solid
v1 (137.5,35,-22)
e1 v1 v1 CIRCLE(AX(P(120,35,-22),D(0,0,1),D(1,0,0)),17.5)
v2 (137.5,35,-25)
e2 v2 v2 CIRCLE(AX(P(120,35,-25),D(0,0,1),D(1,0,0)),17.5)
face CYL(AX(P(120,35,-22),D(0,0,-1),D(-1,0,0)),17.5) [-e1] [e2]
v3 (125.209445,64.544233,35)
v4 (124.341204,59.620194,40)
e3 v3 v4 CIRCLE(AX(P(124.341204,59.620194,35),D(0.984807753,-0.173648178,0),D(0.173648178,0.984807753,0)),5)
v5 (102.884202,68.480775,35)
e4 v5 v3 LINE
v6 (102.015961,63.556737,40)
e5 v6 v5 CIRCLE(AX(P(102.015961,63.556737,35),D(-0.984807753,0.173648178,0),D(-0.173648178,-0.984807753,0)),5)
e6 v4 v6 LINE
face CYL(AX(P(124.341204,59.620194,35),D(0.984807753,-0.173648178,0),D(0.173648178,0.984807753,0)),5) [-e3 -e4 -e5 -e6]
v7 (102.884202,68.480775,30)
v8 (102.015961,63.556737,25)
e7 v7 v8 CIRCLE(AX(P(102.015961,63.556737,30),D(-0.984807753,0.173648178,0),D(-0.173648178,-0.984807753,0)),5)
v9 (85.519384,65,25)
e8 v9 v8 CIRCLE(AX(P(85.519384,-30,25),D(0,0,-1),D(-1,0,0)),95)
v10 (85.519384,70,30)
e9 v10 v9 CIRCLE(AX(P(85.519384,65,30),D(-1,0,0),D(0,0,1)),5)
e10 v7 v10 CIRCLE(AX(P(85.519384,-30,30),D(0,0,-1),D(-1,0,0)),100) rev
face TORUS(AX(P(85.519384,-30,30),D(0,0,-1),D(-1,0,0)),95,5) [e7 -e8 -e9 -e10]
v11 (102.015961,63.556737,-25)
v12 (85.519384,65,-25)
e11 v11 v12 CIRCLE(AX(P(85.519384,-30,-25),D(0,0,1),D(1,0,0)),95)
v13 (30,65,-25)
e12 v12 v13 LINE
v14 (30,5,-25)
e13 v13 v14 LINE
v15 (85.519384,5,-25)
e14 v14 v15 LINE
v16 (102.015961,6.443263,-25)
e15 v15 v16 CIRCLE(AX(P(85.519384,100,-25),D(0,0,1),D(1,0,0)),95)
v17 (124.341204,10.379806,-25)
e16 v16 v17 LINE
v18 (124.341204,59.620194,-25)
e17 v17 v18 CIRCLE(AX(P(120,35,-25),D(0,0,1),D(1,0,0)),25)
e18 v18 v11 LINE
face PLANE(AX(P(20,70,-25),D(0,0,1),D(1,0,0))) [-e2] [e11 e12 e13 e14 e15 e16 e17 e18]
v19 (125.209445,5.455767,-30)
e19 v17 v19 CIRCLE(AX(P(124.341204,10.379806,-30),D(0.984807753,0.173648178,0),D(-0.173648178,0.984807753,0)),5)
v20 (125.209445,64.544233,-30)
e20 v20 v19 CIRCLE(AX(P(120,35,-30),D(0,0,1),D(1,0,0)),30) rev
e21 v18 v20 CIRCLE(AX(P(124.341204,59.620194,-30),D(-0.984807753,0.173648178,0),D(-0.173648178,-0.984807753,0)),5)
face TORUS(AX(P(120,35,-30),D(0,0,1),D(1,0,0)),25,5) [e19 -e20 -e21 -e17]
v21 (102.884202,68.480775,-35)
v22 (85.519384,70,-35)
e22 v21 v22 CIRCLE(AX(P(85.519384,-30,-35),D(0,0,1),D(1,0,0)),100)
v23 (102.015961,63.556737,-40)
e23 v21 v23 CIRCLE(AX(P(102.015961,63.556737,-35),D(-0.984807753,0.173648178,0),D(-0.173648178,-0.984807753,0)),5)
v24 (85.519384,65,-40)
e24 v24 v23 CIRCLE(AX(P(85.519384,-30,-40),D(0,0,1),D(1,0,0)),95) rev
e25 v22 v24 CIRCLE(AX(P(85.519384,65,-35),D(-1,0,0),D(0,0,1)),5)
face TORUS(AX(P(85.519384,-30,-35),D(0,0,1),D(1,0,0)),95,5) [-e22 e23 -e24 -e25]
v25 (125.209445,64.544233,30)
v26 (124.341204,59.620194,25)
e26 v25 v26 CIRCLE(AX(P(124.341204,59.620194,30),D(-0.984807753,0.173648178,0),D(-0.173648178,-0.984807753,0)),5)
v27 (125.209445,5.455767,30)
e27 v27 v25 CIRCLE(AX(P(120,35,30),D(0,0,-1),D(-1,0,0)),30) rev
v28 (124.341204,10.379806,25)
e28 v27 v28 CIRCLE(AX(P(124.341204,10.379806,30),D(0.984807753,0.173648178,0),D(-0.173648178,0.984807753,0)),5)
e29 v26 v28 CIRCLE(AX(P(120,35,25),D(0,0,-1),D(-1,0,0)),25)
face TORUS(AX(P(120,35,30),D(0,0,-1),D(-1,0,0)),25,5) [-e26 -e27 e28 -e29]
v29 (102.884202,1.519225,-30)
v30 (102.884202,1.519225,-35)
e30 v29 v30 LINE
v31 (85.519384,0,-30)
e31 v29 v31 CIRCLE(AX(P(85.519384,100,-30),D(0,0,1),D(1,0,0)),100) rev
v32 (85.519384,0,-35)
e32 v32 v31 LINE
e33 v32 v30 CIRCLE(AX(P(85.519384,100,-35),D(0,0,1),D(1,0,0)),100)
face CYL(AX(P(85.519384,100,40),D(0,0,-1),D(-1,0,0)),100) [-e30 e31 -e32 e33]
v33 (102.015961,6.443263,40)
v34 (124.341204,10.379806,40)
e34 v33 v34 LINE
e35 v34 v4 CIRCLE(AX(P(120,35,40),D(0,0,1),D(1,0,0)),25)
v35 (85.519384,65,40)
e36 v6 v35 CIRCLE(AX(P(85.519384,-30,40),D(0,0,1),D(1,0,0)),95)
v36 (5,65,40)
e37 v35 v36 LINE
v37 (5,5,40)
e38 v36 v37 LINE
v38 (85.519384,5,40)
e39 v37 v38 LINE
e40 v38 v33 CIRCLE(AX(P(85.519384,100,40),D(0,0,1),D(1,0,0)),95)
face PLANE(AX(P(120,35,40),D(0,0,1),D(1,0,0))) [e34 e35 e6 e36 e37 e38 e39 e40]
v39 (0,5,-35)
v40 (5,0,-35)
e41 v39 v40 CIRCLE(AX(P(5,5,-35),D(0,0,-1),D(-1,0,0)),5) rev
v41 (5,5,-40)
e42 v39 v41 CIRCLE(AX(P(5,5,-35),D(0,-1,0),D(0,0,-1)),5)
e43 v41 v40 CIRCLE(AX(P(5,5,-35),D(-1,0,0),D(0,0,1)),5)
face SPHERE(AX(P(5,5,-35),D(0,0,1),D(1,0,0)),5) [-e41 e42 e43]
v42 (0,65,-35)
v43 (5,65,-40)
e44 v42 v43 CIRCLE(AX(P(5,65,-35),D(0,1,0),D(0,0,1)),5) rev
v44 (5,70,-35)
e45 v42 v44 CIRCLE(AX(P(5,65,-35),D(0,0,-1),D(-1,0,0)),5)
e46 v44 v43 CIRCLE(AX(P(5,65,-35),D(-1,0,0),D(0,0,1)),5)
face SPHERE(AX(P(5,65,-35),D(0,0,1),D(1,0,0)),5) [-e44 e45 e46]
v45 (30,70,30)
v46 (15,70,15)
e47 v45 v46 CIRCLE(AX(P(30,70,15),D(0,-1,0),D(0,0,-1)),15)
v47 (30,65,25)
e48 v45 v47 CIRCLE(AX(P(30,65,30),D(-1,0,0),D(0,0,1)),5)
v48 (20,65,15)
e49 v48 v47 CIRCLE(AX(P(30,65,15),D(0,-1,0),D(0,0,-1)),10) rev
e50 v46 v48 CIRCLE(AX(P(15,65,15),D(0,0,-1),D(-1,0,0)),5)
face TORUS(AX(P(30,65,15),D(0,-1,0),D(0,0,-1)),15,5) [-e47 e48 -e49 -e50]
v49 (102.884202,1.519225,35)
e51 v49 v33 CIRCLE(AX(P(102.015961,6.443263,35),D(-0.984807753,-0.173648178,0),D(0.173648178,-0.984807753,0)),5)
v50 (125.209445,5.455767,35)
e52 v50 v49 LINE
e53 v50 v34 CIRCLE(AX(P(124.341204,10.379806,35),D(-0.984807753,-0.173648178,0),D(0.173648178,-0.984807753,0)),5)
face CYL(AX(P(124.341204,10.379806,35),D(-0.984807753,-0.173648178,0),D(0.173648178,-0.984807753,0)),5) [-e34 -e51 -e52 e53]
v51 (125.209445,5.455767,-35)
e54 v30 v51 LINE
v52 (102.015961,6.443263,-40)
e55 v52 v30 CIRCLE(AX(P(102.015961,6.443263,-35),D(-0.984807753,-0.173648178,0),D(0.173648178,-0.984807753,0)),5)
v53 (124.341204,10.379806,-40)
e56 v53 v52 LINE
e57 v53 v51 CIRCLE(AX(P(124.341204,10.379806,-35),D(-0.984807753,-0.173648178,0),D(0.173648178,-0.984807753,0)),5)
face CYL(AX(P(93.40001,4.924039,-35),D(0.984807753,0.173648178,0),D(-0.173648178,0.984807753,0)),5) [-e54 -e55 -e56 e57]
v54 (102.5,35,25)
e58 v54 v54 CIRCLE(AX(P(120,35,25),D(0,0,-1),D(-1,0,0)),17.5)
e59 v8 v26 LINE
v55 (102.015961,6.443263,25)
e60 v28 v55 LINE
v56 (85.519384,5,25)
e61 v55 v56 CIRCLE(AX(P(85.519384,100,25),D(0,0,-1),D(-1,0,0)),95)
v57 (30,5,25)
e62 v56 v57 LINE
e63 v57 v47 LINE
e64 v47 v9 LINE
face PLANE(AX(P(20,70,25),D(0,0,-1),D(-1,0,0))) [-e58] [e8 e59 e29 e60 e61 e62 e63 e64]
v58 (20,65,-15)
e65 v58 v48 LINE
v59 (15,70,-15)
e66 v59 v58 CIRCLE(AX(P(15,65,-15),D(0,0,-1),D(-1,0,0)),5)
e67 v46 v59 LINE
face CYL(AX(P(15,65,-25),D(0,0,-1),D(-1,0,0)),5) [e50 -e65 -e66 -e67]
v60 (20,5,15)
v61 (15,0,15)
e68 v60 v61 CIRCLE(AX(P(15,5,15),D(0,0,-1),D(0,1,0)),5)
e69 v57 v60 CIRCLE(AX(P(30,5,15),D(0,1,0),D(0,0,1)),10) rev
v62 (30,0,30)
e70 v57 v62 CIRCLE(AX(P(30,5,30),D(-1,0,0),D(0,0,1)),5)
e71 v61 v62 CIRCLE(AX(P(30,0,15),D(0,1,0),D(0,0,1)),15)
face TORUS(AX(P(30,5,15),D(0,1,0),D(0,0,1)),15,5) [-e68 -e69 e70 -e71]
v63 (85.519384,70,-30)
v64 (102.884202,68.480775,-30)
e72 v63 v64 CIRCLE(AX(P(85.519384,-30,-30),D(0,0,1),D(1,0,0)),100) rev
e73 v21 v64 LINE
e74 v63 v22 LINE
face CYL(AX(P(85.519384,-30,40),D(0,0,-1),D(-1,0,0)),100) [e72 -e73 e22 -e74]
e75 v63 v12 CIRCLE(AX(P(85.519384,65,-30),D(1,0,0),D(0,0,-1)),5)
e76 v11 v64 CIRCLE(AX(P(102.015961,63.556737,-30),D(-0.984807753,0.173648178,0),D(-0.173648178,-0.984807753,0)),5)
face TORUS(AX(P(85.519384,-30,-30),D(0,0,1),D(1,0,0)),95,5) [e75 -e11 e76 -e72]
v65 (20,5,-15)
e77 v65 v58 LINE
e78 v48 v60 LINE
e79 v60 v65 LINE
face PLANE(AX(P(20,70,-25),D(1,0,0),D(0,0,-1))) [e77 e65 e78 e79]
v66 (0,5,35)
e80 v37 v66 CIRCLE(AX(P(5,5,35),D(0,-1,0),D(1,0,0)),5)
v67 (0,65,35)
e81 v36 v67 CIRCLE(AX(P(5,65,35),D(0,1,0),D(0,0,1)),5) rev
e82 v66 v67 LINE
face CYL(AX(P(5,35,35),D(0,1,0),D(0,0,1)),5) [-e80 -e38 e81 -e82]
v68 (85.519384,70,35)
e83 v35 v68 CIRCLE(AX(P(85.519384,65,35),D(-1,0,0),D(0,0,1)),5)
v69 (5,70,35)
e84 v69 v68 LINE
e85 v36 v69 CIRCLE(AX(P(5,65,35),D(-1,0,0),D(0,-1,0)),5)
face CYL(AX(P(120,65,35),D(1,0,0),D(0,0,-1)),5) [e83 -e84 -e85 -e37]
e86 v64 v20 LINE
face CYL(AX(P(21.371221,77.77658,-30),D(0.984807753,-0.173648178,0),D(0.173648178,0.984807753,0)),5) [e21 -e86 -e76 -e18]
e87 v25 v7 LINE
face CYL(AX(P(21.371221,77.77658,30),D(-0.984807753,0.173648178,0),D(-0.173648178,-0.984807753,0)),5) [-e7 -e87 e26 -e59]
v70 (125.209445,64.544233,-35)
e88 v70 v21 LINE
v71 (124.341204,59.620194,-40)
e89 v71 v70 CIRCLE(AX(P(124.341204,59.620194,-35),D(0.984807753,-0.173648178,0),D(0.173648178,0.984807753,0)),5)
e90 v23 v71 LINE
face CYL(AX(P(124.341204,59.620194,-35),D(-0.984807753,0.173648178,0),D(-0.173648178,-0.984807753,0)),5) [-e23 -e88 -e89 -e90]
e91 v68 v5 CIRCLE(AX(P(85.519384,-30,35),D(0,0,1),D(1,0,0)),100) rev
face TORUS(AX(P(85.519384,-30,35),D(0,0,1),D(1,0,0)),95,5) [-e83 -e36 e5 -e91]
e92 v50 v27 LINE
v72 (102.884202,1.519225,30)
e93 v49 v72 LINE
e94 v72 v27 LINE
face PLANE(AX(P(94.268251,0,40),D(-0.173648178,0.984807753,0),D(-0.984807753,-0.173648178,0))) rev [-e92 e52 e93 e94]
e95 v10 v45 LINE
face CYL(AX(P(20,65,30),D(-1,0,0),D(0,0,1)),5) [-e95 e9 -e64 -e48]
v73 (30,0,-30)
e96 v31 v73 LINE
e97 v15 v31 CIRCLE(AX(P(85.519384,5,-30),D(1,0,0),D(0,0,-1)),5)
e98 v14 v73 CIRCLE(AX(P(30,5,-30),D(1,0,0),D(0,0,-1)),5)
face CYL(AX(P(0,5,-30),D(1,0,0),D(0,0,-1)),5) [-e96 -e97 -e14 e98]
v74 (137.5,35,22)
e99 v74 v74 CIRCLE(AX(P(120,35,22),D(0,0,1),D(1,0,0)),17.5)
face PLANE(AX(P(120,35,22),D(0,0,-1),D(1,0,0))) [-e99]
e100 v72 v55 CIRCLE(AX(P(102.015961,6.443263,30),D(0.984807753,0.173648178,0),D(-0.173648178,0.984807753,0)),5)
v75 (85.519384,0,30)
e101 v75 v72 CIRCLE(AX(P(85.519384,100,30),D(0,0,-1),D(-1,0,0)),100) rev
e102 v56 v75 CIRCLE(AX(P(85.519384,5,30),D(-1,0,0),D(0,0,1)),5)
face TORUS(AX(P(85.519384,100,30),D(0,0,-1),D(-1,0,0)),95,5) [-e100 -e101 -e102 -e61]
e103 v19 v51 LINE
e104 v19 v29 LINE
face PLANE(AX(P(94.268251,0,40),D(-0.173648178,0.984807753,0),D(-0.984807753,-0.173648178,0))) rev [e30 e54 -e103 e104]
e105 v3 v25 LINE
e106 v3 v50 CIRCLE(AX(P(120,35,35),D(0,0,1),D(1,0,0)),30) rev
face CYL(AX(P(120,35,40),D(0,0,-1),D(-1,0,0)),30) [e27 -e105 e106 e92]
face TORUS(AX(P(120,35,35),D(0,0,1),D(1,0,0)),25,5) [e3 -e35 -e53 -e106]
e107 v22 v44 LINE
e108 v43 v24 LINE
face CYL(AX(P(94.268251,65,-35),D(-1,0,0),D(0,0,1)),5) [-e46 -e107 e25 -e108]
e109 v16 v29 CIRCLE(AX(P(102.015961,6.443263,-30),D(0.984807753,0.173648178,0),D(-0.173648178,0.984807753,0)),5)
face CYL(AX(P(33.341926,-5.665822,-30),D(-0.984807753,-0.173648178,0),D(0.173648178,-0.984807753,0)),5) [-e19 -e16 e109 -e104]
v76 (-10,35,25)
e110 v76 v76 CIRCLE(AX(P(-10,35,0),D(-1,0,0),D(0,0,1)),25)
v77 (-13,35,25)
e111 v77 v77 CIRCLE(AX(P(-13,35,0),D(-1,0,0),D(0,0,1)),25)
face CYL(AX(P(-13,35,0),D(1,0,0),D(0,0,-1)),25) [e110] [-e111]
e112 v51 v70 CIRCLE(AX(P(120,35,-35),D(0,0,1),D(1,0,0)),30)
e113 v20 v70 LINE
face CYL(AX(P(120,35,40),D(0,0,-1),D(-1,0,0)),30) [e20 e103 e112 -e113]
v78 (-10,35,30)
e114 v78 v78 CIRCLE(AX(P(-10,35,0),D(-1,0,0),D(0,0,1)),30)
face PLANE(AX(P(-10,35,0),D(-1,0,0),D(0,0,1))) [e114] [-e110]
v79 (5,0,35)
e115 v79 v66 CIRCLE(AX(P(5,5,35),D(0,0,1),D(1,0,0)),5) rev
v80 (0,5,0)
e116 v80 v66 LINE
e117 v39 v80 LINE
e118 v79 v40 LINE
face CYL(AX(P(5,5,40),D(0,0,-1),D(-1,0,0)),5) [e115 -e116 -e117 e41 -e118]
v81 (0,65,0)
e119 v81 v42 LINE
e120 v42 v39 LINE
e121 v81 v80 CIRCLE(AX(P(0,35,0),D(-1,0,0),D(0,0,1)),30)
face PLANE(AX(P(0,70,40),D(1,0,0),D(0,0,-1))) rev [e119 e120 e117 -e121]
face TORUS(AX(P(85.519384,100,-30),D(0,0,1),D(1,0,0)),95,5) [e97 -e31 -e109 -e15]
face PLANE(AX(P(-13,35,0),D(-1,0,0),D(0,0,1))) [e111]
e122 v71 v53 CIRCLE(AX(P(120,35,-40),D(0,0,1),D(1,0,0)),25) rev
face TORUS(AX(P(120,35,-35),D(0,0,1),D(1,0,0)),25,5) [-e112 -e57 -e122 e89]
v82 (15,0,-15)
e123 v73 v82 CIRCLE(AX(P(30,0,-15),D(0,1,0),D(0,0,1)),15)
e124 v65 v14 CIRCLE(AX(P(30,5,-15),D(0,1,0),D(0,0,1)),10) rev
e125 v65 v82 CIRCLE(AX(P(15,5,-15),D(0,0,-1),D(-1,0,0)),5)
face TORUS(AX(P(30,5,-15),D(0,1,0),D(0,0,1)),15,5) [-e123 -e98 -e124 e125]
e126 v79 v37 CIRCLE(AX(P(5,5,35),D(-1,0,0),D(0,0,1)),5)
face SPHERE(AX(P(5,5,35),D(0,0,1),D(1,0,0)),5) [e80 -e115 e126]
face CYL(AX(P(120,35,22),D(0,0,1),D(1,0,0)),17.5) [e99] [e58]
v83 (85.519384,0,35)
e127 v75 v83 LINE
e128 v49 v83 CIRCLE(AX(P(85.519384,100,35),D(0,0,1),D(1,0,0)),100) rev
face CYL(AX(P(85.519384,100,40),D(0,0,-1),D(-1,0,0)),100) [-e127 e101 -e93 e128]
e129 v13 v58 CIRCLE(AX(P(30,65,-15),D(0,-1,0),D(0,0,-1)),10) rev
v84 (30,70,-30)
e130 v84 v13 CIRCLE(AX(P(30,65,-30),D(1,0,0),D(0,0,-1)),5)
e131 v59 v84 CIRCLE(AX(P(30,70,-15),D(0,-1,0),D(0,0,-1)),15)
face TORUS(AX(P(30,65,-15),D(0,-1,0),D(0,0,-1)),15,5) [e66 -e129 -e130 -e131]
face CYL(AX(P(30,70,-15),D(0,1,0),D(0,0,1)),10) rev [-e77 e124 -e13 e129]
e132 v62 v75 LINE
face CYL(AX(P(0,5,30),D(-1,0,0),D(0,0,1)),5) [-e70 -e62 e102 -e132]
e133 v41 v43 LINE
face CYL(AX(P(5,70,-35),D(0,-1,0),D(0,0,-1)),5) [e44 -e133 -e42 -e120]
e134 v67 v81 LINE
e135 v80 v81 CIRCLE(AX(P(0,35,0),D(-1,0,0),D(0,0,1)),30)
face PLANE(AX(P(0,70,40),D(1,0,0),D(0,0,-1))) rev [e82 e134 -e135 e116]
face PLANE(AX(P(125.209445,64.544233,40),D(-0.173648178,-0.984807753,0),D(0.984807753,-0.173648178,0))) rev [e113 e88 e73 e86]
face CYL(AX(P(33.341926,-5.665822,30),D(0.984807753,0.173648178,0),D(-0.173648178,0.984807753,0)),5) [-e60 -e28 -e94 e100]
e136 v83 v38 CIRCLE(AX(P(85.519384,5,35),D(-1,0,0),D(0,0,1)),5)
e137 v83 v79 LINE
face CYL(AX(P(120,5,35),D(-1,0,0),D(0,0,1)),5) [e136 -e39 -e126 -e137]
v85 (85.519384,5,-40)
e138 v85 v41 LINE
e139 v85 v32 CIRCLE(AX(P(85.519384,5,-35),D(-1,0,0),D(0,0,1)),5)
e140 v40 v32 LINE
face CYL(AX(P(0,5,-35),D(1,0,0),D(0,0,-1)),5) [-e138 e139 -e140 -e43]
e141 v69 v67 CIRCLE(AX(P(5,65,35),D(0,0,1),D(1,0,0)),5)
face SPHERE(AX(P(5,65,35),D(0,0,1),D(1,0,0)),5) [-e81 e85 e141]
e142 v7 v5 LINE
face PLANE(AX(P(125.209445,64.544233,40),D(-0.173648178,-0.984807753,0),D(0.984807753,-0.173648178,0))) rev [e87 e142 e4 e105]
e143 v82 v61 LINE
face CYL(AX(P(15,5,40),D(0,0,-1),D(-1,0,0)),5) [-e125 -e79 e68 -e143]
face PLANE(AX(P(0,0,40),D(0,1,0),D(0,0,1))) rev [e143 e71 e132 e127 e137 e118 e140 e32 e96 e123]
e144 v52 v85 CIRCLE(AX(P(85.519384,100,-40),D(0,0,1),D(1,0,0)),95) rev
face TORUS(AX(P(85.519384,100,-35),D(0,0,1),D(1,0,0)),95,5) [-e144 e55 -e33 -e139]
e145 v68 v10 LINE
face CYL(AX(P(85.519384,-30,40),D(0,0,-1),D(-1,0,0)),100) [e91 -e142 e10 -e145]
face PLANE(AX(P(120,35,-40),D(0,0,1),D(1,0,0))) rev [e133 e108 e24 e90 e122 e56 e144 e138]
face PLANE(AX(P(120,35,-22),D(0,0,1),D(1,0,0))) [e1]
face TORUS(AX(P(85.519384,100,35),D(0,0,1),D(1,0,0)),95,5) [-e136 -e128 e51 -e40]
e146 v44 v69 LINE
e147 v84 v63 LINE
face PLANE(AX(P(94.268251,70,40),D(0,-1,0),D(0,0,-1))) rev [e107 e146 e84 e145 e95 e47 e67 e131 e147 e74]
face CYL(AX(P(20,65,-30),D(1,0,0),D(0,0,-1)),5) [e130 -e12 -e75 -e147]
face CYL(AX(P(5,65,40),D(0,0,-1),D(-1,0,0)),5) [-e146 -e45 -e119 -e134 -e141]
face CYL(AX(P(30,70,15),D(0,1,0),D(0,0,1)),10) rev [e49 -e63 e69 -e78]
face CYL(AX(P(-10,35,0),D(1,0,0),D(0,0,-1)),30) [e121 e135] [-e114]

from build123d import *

# Parameters (mm, degrees)
BOSS_EXTRUDE1_DEPTH = 40
SKETCH2_W           = 180
SKETCH2_H           = 50
CUT_EXTRUDE1_DEPTH  = 171.293863659
SKETCH3_R           = 17.5
BOSS_EXTRUDE2_DEPTH = 3
SKETCH4_R           = 30
BOSS_EXTRUDE3_DEPTH = 10
SKETCH5_R           = 25
BOSS_EXTRUDE4_DEPTH = 3
FILLET1_R           = 100
FILLET2_R           = 10
FILLET3_R           = 5


with BuildPart() as part:
    # Sketch1 → Boss-Extrude1 (new, symmetric)
    with BuildSketch(Plane.XY):
        with BuildLine():
            Line((0, 0), (94.268250808, 0))
            Line((94.268250808, 0), (125.20944533, 5.45576741))
            ThreePointArc((125.20944533, 5.45576741), (150, 35), (125.20944533, 64.54423259))
            Line((125.20944533, 64.54423259), (94.268250808, 70))
            Line((94.268250808, 70), (0, 70))
            Line((0, 70), (0, 0))
        make_face()
    extrude(amount=BOSS_EXTRUDE1_DEPTH, both=True)

    # Sketch2 → Cut-Extrude1 (cut, through all)
    with BuildSketch(Plane(origin=(0, 0, 0), x_dir=(1, 0, 0), z_dir=(0, 1, 0))):
        with Locations((110, 0)):
            Rectangle(SKETCH2_W, SKETCH2_H)
    extrude(amount=CUT_EXTRUDE1_DEPTH, mode=Mode.SUBTRACT)

    # Sketch3 → Boss-Extrude2 (add)
    with BuildSketch(Plane.XY.offset(-25)):
        with Locations((120, 35)):
            Circle(SKETCH3_R)
    boss_extrude2 = extrude(amount=BOSS_EXTRUDE2_DEPTH)

    # Mirror1: Boss-Extrude2 across plane
    add(boss_extrude2.mirror(Plane.XY))

    # Sketch4 → Boss-Extrude3 (add)
    with BuildSketch(Plane.ZY):
        with Locations((0, 35)):
            Circle(SKETCH4_R)
    extrude(amount=BOSS_EXTRUDE3_DEPTH)

    # Sketch5 → Boss-Extrude4 (add)
    with BuildSketch(Plane.ZY.offset(10)):
        with Locations((0, 35)):
            Circle(SKETCH5_R)
    extrude(amount=BOSS_EXTRUDE4_DEPTH)

    # Fillet1
    fillet1_edges = [part.edges().sort_by_distance(p)[0] for p in [
        (94.268250808, 70, 32.5),
        (94.268250808, 0, 32.5),
        (94.268250808, 70, -32.5),
        (94.268250808, 0, -32.5),
    ]]
    fillet(fillet1_edges, radius=FILLET1_R)

    # Fillet2
    fillet2_edges = [part.edges().sort_by_distance(p)[0] for p in [
        (20, 35, 25),
        (20, 35, -25),
    ]]
    fillet(fillet2_edges, radius=FILLET2_R)

    # Fillet3
    fillet3_edges = [part.edges().sort_by_distance(p)[0] for p in [
        (0, 70, 0),
        (0, 0, 0),
        (150, 35, 40),
        (114.046823776, 66.512503946, 40),
        (150, 35, 25),
        (114.046823776, 3.487496054, 25),
        (150, 35, -25),
        (114.046823776, 66.512503946, -25),
        (0, 35, 40),
        (114.046823776, 3.487496054, -25),
        (114.046823776, 3.487496054, -40),
        (114.046823776, 66.512503946, -40),
        (42.759692228, 70, -40),
        (94.23495873, 69.619469809, -40),
        (94.23495873, 0.380530191, -40),
        (57.759692228, 0, -25),
        (150, 35, -40),
        (42.759692228, 0, 40),
        (57.759692228, 70, -25),
        (94.23495873, 69.619469809, -25),
        (94.23495873, 0.380530191, -25),
        (114.046823776, 3.487496054, 40),
        (114.046823776, 66.512503946, 25),
        (94.23495873, 69.619469809, 25),
        (94.23495873, 0.380530191, 25),
        (42.759692228, 70, 40),
        (94.23495873, 69.619469809, 40),
        (94.23495873, 0.380530191, 40),
        (42.759692228, 0, -40),
        (0, 35, -40),
        (20, 0, 0),
        (20, 70, 0),
        (57.759692228, 0, 25),
        (57.759692228, 70, 25),
        (22.928932188, 0, -22.071067812),
        (22.928932188, 70, -22.071067812),
        (22.928932188, 0, 22.071067812),
        (22.928932188, 70, 22.071067812),
    ]]
    fillet(fillet3_edges, radius=FILLET3_R - 0.0001)  # a hair under: the kernel refuses the full size


solid = part.part
